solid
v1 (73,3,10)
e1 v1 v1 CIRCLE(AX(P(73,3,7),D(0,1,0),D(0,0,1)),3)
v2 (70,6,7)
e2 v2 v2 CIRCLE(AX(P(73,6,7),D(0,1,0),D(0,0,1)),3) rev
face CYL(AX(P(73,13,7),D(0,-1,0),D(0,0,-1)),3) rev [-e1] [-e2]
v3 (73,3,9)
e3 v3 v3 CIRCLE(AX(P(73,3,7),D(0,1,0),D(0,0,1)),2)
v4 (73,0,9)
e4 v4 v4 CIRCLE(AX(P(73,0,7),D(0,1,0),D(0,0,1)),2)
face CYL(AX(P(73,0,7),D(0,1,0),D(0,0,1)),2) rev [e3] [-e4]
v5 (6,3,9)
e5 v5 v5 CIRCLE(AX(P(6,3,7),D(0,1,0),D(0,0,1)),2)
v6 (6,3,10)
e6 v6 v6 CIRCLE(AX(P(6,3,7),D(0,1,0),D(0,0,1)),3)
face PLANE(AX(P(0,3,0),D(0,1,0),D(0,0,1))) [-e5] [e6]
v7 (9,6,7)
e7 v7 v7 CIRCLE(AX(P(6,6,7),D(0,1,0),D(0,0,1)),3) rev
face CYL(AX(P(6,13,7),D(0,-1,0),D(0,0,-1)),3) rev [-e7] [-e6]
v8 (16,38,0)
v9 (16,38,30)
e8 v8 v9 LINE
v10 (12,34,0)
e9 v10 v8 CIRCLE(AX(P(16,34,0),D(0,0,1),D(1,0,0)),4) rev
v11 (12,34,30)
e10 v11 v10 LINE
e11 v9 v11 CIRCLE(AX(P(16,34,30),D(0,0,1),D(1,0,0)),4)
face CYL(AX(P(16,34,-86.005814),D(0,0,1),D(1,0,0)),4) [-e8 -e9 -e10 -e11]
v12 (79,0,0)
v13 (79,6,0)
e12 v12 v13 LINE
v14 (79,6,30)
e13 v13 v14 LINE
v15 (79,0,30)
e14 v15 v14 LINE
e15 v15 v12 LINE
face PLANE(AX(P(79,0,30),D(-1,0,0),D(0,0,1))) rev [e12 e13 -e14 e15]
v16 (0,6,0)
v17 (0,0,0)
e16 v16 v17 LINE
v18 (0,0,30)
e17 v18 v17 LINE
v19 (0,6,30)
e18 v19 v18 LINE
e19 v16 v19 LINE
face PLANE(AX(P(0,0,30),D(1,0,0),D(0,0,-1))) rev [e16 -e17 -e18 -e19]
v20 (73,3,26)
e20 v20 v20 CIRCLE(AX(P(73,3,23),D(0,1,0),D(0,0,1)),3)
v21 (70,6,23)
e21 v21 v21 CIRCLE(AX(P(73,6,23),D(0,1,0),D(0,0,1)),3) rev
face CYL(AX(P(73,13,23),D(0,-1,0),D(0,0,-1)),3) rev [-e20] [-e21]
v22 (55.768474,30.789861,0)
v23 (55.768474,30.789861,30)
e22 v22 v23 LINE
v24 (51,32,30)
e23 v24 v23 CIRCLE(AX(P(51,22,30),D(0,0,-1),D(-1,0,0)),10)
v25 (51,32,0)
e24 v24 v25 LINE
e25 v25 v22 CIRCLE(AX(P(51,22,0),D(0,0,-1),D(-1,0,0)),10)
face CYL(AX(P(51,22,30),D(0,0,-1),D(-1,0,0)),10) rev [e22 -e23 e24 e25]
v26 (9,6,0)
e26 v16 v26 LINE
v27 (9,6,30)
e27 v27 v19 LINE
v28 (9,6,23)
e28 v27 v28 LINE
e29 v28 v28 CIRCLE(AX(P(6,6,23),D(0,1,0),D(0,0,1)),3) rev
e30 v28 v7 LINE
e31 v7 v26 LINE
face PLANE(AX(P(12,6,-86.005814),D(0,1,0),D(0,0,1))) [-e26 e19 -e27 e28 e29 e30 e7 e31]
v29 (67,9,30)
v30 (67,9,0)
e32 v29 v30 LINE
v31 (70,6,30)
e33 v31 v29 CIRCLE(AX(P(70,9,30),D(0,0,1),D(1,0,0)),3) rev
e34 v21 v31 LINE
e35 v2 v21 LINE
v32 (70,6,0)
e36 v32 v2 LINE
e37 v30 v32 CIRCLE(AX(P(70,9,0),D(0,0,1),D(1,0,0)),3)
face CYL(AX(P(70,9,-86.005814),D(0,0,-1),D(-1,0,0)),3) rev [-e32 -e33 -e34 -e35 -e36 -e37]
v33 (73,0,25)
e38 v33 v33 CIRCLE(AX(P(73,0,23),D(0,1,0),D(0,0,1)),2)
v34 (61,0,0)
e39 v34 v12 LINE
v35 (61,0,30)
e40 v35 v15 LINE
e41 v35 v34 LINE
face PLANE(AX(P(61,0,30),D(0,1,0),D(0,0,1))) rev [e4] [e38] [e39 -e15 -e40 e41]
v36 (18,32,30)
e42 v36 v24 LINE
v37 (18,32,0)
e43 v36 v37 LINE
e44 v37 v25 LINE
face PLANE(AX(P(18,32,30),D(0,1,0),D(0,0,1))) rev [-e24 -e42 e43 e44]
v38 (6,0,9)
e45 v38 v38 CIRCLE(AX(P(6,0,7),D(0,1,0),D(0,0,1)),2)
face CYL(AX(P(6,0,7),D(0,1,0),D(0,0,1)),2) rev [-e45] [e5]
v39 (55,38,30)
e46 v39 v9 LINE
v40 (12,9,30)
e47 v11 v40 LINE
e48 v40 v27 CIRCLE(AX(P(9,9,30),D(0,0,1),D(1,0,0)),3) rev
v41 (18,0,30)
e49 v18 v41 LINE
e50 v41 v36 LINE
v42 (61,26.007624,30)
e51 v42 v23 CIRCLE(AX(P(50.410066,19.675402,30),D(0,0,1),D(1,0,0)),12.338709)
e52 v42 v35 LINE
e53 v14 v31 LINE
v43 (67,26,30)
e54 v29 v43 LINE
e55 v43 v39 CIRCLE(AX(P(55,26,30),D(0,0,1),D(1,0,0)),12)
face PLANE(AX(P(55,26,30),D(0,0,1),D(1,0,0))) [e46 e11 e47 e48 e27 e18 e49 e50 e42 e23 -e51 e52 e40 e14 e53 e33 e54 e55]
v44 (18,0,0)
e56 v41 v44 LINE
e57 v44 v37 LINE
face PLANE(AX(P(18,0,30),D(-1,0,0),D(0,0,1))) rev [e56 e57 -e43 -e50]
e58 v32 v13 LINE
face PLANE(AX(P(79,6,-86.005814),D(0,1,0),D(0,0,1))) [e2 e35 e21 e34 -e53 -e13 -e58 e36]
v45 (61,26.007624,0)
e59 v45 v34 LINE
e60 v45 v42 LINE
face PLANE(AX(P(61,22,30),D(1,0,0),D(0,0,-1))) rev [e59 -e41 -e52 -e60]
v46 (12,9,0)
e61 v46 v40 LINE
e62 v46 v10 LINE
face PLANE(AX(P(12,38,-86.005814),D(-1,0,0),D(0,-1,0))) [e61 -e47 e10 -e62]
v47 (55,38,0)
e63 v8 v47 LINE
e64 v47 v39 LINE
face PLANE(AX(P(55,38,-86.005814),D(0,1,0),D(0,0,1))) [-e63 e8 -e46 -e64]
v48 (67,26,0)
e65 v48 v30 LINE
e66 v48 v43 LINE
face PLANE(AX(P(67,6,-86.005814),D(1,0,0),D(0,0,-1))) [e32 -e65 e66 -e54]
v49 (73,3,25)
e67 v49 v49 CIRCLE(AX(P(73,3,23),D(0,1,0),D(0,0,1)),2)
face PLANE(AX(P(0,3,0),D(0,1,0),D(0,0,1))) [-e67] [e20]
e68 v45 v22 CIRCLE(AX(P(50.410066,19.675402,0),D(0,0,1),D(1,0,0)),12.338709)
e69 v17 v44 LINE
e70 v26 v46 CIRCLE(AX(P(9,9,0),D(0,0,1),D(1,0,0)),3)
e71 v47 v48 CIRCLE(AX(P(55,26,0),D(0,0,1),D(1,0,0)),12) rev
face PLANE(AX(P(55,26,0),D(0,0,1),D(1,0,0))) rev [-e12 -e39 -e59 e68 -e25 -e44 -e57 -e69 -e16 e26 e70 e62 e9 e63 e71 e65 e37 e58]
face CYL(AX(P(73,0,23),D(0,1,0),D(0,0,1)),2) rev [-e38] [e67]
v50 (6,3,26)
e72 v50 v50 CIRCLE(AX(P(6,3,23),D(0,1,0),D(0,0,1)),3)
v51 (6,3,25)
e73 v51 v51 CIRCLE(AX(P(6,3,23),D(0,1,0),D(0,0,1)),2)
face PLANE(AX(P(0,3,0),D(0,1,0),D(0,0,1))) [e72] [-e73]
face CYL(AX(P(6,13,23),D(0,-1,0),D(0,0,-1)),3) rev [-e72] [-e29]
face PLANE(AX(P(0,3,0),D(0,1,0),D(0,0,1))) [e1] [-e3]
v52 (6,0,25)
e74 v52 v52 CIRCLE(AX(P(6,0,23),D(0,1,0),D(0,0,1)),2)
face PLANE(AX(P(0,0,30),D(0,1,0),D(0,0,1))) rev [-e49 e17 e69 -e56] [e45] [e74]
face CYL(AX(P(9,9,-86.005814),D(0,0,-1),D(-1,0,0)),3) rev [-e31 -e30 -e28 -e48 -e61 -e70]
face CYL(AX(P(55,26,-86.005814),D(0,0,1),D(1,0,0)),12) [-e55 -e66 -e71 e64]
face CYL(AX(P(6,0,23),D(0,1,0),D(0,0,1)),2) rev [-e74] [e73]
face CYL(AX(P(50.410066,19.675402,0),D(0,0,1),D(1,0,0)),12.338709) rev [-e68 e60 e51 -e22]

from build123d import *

# Parameters (mm, degrees)
BOSS_EXTRUDE1_DEPTH     = 30
BOSS_EXTRUDE2_START     = -30
BOSS_EXTRUDE2_DEPTH     = 30
CUT_EXTRUDE1_DEPTH      = 93.655275079
CUT_EXTRUDE1_DEPTH_BACK = 93.655275079
SKETCH2_R               = 2
CUT_EXTRUDE3_START      = -1
SKETCH2_3_R             = 3
CUT_EXTRUDE3_DEPTH      = 10
CUT_EXTRUDE2_DEPTH      = 93.655275079
FILLET1_R               = 4
FILLET2_R               = 3


with BuildPart() as part:
    # Sketch1 → Boss-Extrude1 (new body)
    with BuildSketch(Plane.XY):
        with BuildLine():
            Line((0, 0), (18, 0))
            Line((18, 0), (18, 32))
            Line((18, 32), (51, 32))
            ThreePointArc((51, 32), (58.071067812, 29.071067812), (61, 22))
            Line((61, 22), (61, 0))
            Line((61, 0), (79, 0))
            Line((79, 0), (79, 4))
            Line((79, 4), (65, 4))
            Line((65, 4), (65, 26))
            ThreePointArc((65, 26), (62.071067812, 33.071067812), (55, 36))
            Line((55, 36), (14, 36))
            Line((14, 36), (14, 4))
            Line((14, 4), (0, 4))
            Line((0, 4), (0, 0))
        make_face()
    extrude(amount=BOSS_EXTRUDE1_DEPTH)

    # Sketch4 → Boss-Extrude2 (add)
    with BuildSketch(Plane.XY.offset(30).offset(BOSS_EXTRUDE2_START)):
        with BuildLine():
            Line((79, 6), (67, 6))
            Line((67, 6), (67, 26))
            ThreePointArc((67, 26), (63.485281374, 34.485281374), (55, 38))
            Line((55, 38), (12, 38))
            Line((12, 38), (12, 6))
            Line((12, 6), (0, 6))
            Line((0, 6), (0, 4))
            Line((0, 4), (14, 4))
            Line((14, 4), (14, 36))
            Line((14, 36), (55, 36))
            ThreePointArc((55, 36), (62.071067812, 33.071067812), (65, 26))
            Line((65, 26), (65, 4))
            Line((65, 4), (79, 4))
            Line((79, 4), (79, 6))
        make_face()
    extrude(amount=BOSS_EXTRUDE2_DEPTH)

    # Sketch2 (on Top Plane) → Cut-Extrude1 (cut, two sides: drawn at the far end of the back side and taken through both)
    with BuildSketch(Plane(origin=(0, 0, 0), x_dir=(1, 0, 0), z_dir=(0, 1, 0)).offset(-CUT_EXTRUDE1_DEPTH_BACK)):
        with Locations(Location((6, -7, 0), (0, 0, 270))):
            Circle(SKETCH2_R)
        with Locations(Location((6, -23, 0), (0, 0, 270))):
            Circle(SKETCH2_R)
        with Locations(Location((73, -7, 0), (0, 0, 270))):
            Circle(SKETCH2_R)
        with Locations(Location((73, -23, 0), (0, 0, 270))):
            Circle(SKETCH2_R)
    extrude(amount=CUT_EXTRUDE1_DEPTH + CUT_EXTRUDE1_DEPTH_BACK, mode=Mode.SUBTRACT)

    # Sketch2<3> → Cut-Extrude3 (cut)
    with BuildSketch(Plane(origin=(0, 4, 0), x_dir=(1, 0, 0), z_dir=(0, 1, 0)).offset(CUT_EXTRUDE3_START)):
        with Locations(Location((6, -7, 0), (0, 0, 270))):
            Circle(SKETCH2_3_R)
        with Locations(Location((6, -23, 0), (0, 0, 270))):
            Circle(SKETCH2_3_R)
        with Locations(Location((73, -7, 0), (0, 0, 270))):
            Circle(SKETCH2_3_R)
        with Locations(Location((73, -23, 0), (0, 0, 270))):
            Circle(SKETCH2_3_R)
    extrude(amount=CUT_EXTRUDE3_DEPTH, mode=Mode.SUBTRACT)

    # Sketch3 → Cut-Extrude2 (cut, through all)
    with BuildSketch(Plane.XY.offset(30)):
        with BuildLine():
            ThreePointArc((55.768474142, 30.789860884), (59.593158366, 27.114452981), (61, 22))
            Line((61, 22), (61, 26.007623502))
            ThreePointArc((61, 26.007623502), (58.735019606, 28.782480547), (55.768474142, 30.789860884))
        make_face()
    extrude(amount=-CUT_EXTRUDE2_DEPTH, mode=Mode.SUBTRACT)

    # Fillet1
    fillet1_edges = [part.edges().sort_by_distance(p)[0] for p in [
        (12, 38, 15),
    ]]
    fillet(fillet1_edges, radius=FILLET1_R)

    # Fillet2
    fillet2_edges = [part.edges().sort_by_distance(p)[0] for p in [
        (12, 6, 15),
        (67, 6, 15),
    ]]
    fillet(fillet2_edges, radius=FILLET2_R - 0.0001)  # a hair under: the kernel refuses the full size


solid = part.part
